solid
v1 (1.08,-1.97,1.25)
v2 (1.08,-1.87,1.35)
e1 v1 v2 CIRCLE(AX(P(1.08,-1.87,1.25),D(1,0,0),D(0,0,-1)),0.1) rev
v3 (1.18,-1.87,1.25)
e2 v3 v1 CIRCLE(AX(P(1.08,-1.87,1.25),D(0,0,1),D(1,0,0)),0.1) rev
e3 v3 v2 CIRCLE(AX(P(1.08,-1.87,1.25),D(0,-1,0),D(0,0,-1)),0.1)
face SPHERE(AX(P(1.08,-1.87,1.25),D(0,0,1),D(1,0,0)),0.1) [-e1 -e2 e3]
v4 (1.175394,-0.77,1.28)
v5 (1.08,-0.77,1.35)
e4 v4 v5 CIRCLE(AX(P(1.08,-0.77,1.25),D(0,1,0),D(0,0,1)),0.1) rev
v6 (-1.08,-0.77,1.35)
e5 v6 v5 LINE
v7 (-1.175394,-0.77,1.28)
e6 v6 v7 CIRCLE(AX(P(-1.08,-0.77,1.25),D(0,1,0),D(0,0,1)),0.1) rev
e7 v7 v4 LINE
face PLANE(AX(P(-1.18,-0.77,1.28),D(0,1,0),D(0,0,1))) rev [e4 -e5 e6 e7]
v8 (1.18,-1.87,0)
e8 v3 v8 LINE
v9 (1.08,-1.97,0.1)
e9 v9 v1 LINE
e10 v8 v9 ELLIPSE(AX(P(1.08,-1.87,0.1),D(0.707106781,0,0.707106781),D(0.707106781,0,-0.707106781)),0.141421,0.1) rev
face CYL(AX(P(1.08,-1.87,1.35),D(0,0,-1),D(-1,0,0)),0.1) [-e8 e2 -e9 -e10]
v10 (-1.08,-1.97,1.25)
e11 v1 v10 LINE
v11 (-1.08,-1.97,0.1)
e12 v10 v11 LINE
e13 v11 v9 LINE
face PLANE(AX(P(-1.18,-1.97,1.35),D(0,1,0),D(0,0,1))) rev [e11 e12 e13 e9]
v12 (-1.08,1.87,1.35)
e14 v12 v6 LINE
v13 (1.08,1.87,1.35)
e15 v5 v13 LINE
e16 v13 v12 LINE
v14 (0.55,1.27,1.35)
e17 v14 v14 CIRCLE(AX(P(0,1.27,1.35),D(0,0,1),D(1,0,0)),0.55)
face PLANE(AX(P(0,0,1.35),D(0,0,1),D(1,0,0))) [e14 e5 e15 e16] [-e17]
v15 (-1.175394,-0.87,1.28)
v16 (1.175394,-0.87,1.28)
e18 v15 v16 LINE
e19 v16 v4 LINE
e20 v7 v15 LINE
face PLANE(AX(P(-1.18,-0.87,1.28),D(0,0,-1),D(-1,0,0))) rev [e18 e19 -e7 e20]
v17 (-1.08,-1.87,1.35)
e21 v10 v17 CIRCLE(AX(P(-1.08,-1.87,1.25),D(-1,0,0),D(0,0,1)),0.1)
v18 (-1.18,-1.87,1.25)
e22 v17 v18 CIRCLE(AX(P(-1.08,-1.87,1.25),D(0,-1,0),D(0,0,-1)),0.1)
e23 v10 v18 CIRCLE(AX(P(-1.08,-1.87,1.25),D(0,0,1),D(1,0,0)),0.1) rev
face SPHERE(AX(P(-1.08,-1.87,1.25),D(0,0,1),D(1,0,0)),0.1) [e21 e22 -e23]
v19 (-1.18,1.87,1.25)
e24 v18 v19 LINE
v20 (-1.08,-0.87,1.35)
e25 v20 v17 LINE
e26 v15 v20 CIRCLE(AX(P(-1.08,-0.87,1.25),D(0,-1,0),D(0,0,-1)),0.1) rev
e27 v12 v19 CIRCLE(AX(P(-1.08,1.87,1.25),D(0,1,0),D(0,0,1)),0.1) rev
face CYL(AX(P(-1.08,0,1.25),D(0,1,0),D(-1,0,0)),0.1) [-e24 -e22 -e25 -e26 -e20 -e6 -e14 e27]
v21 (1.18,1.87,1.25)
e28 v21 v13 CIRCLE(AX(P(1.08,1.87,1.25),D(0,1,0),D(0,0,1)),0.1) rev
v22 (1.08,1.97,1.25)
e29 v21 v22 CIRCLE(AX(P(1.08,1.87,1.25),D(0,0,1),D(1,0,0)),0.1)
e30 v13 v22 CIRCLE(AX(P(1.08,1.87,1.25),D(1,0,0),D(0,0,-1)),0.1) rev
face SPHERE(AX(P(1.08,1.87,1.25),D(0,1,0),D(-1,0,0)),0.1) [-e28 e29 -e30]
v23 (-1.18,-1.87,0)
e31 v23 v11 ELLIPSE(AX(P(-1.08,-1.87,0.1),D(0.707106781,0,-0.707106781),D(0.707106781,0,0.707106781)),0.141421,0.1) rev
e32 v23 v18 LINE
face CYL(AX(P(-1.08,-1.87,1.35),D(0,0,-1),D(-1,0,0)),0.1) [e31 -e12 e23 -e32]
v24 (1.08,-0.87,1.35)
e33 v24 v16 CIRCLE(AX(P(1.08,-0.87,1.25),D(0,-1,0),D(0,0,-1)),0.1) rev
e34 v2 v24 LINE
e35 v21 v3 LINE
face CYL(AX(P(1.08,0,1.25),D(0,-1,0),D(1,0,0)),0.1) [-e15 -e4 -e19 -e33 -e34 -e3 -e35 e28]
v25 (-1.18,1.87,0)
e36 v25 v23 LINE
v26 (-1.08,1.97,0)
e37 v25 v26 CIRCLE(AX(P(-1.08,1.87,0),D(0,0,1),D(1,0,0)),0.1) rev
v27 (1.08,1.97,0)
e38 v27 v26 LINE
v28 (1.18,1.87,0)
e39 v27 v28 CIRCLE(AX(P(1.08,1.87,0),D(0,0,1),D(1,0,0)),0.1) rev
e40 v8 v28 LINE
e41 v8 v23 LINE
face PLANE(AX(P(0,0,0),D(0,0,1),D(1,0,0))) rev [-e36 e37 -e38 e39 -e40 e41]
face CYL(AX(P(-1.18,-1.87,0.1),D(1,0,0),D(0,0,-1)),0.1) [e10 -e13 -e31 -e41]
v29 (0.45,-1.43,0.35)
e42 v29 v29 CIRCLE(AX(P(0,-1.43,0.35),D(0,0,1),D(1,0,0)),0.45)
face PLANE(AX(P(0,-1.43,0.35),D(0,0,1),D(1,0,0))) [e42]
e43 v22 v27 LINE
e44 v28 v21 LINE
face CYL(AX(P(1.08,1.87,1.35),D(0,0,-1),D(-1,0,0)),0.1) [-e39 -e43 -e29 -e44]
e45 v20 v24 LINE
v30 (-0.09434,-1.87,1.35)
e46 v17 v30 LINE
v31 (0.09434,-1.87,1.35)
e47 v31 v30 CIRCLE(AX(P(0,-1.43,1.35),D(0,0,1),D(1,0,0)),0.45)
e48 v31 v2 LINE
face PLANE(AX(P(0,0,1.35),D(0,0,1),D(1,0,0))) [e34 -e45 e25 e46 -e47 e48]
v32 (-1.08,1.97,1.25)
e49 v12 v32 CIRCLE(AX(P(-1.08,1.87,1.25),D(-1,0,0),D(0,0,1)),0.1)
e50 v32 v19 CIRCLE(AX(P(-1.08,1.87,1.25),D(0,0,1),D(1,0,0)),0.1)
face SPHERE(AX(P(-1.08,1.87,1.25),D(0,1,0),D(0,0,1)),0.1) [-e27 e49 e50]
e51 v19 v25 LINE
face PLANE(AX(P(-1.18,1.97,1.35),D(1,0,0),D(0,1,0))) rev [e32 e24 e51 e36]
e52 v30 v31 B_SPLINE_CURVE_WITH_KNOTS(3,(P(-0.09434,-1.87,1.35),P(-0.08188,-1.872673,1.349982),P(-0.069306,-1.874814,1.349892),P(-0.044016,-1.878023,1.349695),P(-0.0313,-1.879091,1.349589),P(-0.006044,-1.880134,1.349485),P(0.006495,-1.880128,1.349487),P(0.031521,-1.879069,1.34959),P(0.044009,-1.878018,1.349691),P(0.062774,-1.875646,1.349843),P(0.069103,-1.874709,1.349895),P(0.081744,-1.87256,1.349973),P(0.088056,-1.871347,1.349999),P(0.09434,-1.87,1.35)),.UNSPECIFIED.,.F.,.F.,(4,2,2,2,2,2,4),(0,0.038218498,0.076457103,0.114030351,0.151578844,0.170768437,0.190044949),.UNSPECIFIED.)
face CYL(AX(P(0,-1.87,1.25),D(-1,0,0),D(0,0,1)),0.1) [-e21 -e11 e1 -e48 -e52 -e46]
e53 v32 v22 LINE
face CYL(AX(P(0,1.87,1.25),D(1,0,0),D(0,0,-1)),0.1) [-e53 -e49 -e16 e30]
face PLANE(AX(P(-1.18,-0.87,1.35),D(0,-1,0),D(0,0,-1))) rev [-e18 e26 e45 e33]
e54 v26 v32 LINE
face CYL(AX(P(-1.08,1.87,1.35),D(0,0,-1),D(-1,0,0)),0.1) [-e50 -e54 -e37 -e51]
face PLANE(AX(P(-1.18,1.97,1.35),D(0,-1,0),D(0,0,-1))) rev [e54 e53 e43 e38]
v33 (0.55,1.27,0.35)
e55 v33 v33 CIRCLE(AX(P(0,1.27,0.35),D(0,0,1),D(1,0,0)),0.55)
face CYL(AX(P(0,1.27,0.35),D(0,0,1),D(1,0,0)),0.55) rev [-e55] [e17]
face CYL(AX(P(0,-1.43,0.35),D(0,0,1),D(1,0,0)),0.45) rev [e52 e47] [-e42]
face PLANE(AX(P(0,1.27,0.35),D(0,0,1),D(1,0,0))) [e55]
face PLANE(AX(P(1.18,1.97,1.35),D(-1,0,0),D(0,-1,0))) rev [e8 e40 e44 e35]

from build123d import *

# Parameters (mm, degrees)
SKETCH1_W           = 2.36
SKETCH1_H           = 3.94
BOSS_EXTRUDE1_DEPTH = 1.35
SKETCH2_W           = 0.07
SKETCH2_H           = 0.1
CUT_EXTRUDE1_DEPTH  = 4.357528853
FILLET2_R           = 0.1
SKETCH3_R           = 0.55
SKETCH3_R_2         = 0.45
CUT_EXTRUDE2_DEPTH  = 1


with BuildPart() as part:
    # Sketch1 → Boss-Extrude1 (new body)
    with BuildSketch(Plane.XY):
        Rectangle(SKETCH1_W, SKETCH1_H)
    extrude(amount=BOSS_EXTRUDE1_DEPTH)

    # Sketch2 → Cut-Extrude1 (cut, through all)
    with BuildSketch(Plane(origin=(1.18, 0, 0), x_dir=(0, 0, -1), z_dir=(1, 0, 0))):
        with Locations((-1.315, -0.82)):
            Rectangle(SKETCH2_W, SKETCH2_H)
    extrude(amount=-CUT_EXTRUDE1_DEPTH, mode=Mode.SUBTRACT)

    # Fillet2
    # the kernel refuses this fillet: 0.1 mm, written as the material it takes off along each edge
    with BuildSketch(Plane(origin=(-1.08, 1.87, 1.25), x_dir=(-1, 0, 0), z_dir=(0, 1, 0))) as fillet2_piece_1_section:
        Polygon((0, 0), (FILLET2_R, 0), (FILLET2_R, FILLET2_R), (0, FILLET2_R), align=None)
    fillet2_piece_1 = extrude(amount=FILLET2_R, mode=Mode.PRIVATE)
    fillet2_piece_1 = fillet2_piece_1 - Plane(origin=(-1.08, 1.87, 1.25), x_dir=(0.7071067811865475, 0, -0.7071067811865475), z_dir=(0, 1, 0)) * Sphere(FILLET2_R, mode=Mode.PRIVATE)
    add(fillet2_piece_1, mode=Mode.SUBTRACT)
    with BuildSketch(Plane(origin=(1.08, 1.87, 1.25), x_dir=(1, 0, 0), z_dir=(0, 1, 0))) as fillet2_piece_2_section:
        Polygon((0, 0), (FILLET2_R, 0), (FILLET2_R, -FILLET2_R), (0, -FILLET2_R), align=None)
    fillet2_piece_2 = extrude(amount=FILLET2_R, mode=Mode.PRIVATE)
    fillet2_piece_2 = fillet2_piece_2 - Plane(origin=(1.08, 1.87, 1.25), x_dir=(-0.7071067811865475, 0, -0.7071067811865475), z_dir=(0, 1, 0)) * Sphere(FILLET2_R, mode=Mode.PRIVATE)
    add(fillet2_piece_2, mode=Mode.SUBTRACT)
    with BuildSketch(Plane(origin=(-1.08, -1.87, 1.25), x_dir=(-1, 0, 0), z_dir=(0, 0, 1))) as fillet2_piece_3_section:
        Polygon((0, 0), (FILLET2_R, 0), (FILLET2_R, FILLET2_R), (0, FILLET2_R), align=None)
    fillet2_piece_3 = extrude(amount=FILLET2_R, mode=Mode.PRIVATE)
    fillet2_piece_3 = fillet2_piece_3 - Plane(origin=(-1.08, -1.87, 1.25), x_dir=(0.7071067811865475, 0.7071067811865477, 0), z_dir=(0, 0, 1)) * Sphere(FILLET2_R, mode=Mode.PRIVATE)
    add(fillet2_piece_3, mode=Mode.SUBTRACT)
    with BuildSketch(Plane(origin=(1.08, -1.87, 1.25), x_dir=(0, -1, 0), z_dir=(0, 0, 1))) as fillet2_piece_4_section:
        Polygon((0, 0), (FILLET2_R, 0), (FILLET2_R, FILLET2_R), (0, FILLET2_R), align=None)
    fillet2_piece_4 = extrude(amount=FILLET2_R, mode=Mode.PRIVATE)
    fillet2_piece_4 = fillet2_piece_4 - Plane(origin=(1.08, -1.87, 1.25), x_dir=(-0.7071067811865476, 0.7071067811865475, 0), z_dir=(0, 0, 1)) * Sphere(FILLET2_R, mode=Mode.PRIVATE)
    add(fillet2_piece_4, mode=Mode.SUBTRACT)
    with BuildSketch(Plane(origin=(-1.18, -1.02, 1.35), x_dir=(0, 0, -1), z_dir=(0, 1, 0)), Plane(origin=(1.18, 1.87, 1.35), x_dir=(0, 0, -1), z_dir=(0, -1, 0))) as fillet2_piece_5:
        with BuildLine():
            CenterArc((FILLET2_R, -FILLET2_R), FILLET2_R, 90, 90)
            Line((0, -FILLET2_R), (0, 0))
            Line((0, 0), (FILLET2_R, 0))
        make_face()
    extrude(amount=2.89, mode=Mode.SUBTRACT)
    with BuildSketch(Plane(origin=(-1.18, -1.87, 1.35), x_dir=(0, 0, -1), z_dir=(0, 1, 0)), Plane(origin=(1.18, -0.62, 1.35), x_dir=(0, 0, -1), z_dir=(0, -1, 0))) as fillet2_piece_6:
        with BuildLine():
            CenterArc((FILLET2_R, -FILLET2_R), FILLET2_R, 90, 90)
            Line((0, -FILLET2_R), (0, 0))
            Line((0, 0), (FILLET2_R, 0))
        make_face()
    extrude(amount=1.25, mode=Mode.SUBTRACT)
    with BuildSketch(Plane(origin=(1.08, -1.97, 1.35), x_dir=(0, 1, 0), z_dir=(-1, 0, 0))) as fillet2_piece_7:
        with BuildLine():
            CenterArc((FILLET2_R, FILLET2_R), FILLET2_R, 180, 90)
            Line((0, FILLET2_R), (0, 0))
            Line((0, 0), (FILLET2_R, 0))
        make_face()
    extrude(amount=2.16, mode=Mode.SUBTRACT)
    with BuildSketch(Plane(origin=(1.43, -1.97, 0), x_dir=(0, 1, 0), z_dir=(-1, 0, 0))) as fillet2_piece_8:
        with BuildLine():
            CenterArc((FILLET2_R, -FILLET2_R), FILLET2_R, 90, 90)
            Line((0, -FILLET2_R), (0, 0))
            Line((0, 0), (FILLET2_R, 0))
        make_face()
    extrude(amount=2.86, mode=Mode.SUBTRACT)
    with BuildSketch(Plane(origin=(1.18, -1.97, -0.25), x_dir=(0, 1, 0), z_dir=(0, 0, 1)), Plane(origin=(1.18, 1.97, -0.25), x_dir=(-1, 0, 0), z_dir=(0, 0, 1))) as fillet2_piece_9:
        with BuildLine():
            CenterArc((FILLET2_R, FILLET2_R), FILLET2_R, 180, 90)
            Line((0, FILLET2_R), (0, 0))
            Line((0, 0), (FILLET2_R, 0))
        make_face()
    extrude(amount=1.5, mode=Mode.SUBTRACT)
    with BuildSketch(Plane(origin=(-1.18, -1.97, -0.25), x_dir=(0, 1, 0), z_dir=(0, 0, 1)), Plane(origin=(-1.18, 1.97, -0.25), x_dir=(1, 0, 0), z_dir=(0, 0, 1))) as fillet2_piece_10:
        with BuildLine():
            CenterArc((FILLET2_R, -FILLET2_R), FILLET2_R, 90, 90)
            Line((0, -FILLET2_R), (0, 0))
            Line((0, 0), (FILLET2_R, 0))
        make_face()
    extrude(amount=1.5, mode=Mode.SUBTRACT)
    with BuildSketch(Plane(origin=(-1.08, 1.97, 1.35), x_dir=(0, 0, -1), z_dir=(1, 0, 0))) as fillet2_piece_11:
        with BuildLine():
            CenterArc((FILLET2_R, -FILLET2_R), FILLET2_R, 90, 90)
            Line((0, -FILLET2_R), (0, 0))
            Line((0, 0), (FILLET2_R, 0))
        make_face()
    extrude(amount=2.16, mode=Mode.SUBTRACT)

    # Sketch3 → Cut-Extrude2 (cut)
    with BuildSketch(Plane.XY.offset(1.35)):
        with Locations((0, 1.27)):
            Circle(SKETCH3_R)
        with Locations((0, -1.43)):
            Circle(SKETCH3_R_2)
    extrude(amount=-CUT_EXTRUDE2_DEPTH, mode=Mode.SUBTRACT)


solid = part.part
